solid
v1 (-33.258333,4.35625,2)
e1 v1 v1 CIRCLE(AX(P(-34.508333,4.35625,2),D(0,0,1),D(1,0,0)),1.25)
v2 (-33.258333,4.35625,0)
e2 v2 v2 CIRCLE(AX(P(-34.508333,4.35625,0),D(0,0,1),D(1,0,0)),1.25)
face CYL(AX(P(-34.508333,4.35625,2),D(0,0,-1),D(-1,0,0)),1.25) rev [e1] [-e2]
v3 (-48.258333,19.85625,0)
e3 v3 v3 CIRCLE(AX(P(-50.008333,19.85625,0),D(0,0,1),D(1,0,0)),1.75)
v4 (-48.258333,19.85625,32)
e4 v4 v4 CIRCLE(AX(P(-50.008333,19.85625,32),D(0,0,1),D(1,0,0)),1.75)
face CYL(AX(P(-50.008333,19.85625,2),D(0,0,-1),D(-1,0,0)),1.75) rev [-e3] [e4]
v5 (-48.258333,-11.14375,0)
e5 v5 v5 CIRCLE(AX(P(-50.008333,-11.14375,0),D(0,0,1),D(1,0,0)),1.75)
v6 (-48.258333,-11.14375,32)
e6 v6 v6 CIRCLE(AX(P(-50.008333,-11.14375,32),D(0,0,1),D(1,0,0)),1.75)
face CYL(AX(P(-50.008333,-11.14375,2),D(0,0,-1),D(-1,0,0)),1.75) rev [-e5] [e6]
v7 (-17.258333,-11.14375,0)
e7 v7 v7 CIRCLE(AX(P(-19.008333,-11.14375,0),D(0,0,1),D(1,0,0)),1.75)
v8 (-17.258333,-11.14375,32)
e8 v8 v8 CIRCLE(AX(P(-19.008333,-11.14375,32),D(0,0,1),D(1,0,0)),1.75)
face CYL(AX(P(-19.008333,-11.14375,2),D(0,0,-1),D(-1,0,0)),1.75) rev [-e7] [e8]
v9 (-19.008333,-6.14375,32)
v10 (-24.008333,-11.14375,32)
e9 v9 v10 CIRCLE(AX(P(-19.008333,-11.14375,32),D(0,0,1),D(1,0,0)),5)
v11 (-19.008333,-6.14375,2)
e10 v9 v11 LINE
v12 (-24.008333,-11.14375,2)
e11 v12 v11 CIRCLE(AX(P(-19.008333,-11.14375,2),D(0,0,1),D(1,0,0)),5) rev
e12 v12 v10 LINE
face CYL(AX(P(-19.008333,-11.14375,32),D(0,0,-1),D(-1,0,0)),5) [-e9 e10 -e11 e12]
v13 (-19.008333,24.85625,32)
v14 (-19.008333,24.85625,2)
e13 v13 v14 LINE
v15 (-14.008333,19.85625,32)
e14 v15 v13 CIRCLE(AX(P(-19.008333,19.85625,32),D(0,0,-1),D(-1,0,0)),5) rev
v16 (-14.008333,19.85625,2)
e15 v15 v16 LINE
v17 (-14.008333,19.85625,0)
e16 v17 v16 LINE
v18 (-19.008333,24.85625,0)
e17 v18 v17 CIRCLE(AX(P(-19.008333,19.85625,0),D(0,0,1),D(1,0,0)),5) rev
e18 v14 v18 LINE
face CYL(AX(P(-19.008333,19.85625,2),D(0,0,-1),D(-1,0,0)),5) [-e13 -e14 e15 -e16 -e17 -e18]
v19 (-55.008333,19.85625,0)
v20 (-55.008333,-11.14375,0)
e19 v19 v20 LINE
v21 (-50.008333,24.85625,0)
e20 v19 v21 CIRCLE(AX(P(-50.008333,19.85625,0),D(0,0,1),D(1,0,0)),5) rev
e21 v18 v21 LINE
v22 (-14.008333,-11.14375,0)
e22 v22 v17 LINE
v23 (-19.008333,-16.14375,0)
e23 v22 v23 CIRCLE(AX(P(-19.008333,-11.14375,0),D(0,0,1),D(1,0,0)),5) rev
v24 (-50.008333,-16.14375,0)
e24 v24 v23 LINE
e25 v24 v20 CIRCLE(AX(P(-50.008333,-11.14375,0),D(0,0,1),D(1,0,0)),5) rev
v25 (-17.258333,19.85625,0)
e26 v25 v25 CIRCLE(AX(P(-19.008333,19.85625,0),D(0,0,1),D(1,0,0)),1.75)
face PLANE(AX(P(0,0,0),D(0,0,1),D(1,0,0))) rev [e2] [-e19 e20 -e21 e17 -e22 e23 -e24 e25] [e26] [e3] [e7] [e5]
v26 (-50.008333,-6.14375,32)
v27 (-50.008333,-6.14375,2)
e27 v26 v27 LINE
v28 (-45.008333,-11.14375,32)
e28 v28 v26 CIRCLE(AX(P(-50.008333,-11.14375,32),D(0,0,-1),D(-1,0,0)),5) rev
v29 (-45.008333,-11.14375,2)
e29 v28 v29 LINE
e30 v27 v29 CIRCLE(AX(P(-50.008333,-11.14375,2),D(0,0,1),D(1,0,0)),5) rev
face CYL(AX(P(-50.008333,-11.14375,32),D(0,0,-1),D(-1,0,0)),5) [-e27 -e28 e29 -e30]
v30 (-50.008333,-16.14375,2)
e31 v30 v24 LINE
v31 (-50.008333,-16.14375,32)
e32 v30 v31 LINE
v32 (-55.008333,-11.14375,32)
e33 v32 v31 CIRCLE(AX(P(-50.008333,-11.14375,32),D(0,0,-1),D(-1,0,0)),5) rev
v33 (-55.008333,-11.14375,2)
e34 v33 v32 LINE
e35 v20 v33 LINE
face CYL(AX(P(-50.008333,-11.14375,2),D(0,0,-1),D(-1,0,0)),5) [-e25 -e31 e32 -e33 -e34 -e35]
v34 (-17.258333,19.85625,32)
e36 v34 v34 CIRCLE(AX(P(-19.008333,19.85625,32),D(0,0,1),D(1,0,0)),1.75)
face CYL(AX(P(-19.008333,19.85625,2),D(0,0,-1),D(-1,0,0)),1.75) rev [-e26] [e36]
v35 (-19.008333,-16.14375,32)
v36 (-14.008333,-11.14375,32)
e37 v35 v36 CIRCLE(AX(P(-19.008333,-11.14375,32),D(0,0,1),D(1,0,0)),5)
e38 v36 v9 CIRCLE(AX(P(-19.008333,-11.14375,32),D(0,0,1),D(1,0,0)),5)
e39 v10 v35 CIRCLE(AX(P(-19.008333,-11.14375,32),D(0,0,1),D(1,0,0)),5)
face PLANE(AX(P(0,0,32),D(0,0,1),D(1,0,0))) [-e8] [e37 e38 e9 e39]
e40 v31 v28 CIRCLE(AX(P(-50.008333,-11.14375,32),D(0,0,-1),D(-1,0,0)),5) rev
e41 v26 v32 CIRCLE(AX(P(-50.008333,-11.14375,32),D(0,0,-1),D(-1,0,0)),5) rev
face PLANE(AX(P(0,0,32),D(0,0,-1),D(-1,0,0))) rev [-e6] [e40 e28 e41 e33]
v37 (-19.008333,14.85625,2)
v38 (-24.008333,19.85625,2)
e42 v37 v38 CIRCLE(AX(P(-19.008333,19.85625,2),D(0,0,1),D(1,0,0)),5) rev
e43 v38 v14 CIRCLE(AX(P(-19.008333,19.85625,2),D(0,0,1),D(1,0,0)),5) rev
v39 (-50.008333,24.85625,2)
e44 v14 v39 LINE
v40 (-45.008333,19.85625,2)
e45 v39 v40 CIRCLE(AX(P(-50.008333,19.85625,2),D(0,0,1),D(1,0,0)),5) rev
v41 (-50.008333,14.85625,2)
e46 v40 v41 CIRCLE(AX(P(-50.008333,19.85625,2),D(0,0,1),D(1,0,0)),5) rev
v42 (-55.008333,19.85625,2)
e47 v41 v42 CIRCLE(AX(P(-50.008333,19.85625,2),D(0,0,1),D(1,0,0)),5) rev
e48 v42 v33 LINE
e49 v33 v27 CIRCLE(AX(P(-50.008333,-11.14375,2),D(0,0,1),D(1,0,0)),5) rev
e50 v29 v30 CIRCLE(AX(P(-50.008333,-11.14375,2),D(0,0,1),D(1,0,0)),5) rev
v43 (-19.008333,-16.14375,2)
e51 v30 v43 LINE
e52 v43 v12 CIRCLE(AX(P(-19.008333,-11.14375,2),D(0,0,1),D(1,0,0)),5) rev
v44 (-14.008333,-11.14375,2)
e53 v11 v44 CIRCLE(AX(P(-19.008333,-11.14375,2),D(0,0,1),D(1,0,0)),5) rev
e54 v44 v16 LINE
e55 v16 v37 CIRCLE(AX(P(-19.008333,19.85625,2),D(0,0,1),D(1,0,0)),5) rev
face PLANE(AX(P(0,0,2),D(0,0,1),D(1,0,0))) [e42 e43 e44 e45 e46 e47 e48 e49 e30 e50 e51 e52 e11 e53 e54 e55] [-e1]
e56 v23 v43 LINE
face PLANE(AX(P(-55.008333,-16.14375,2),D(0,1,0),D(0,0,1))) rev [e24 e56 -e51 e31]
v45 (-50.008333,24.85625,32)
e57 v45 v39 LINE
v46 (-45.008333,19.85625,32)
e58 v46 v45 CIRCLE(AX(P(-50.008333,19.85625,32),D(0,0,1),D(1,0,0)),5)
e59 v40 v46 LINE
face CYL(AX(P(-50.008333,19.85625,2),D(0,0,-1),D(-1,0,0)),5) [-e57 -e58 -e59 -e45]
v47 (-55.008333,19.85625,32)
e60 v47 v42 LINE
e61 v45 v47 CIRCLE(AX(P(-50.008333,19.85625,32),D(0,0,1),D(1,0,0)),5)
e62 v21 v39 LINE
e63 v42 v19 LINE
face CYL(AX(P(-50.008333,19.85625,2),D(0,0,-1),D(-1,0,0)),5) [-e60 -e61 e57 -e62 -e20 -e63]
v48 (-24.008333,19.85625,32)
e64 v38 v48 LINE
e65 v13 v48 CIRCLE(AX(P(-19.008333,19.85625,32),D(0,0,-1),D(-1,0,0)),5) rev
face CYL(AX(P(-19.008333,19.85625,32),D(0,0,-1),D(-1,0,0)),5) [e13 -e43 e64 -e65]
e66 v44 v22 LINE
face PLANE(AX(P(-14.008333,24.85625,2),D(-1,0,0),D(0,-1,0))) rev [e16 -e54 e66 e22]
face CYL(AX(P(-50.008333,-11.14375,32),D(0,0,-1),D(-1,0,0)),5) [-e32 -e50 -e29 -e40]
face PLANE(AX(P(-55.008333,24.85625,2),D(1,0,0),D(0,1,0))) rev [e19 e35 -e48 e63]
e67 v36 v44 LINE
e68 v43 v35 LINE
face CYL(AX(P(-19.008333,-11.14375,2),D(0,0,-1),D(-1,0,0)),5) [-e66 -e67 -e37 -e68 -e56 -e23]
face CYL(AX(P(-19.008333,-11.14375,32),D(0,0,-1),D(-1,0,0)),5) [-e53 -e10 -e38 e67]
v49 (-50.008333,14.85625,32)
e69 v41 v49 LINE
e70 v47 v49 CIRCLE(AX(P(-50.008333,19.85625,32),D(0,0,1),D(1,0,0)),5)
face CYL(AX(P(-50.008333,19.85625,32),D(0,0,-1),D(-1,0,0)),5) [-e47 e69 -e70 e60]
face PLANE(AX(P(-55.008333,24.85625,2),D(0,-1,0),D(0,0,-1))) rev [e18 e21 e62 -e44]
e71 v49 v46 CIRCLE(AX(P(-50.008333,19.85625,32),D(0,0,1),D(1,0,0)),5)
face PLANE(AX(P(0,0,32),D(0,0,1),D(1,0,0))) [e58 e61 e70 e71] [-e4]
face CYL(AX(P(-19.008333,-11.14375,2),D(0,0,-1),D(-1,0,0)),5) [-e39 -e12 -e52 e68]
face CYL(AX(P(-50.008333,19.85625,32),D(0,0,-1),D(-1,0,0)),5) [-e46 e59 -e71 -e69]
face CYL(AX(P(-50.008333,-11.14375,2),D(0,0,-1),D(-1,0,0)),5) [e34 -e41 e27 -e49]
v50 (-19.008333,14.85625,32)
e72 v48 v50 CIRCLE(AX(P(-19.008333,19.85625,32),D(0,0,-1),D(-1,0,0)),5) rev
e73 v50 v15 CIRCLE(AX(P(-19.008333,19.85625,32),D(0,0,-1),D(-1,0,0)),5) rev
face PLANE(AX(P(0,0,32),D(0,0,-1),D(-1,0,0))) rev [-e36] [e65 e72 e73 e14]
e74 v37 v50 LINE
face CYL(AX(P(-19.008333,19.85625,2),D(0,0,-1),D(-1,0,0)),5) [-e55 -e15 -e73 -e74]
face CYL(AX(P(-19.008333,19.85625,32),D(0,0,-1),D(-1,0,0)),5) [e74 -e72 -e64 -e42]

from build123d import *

# Parameters (mm, degrees)
SKETCH1_W           = 41
SKETCH1_H           = 41
SKETCH1_R           = 1.75
SKETCH1_R_2         = 1.25
BOSS_EXTRUDE1_DEPTH = 2
SKETCH2_W           = 10
SKETCH2_H           = 10
SKETCH2_R           = 1.75
BOSS_EXTRUDE2_DEPTH = 30
FILLET1_R           = 5


with BuildPart() as part:
    # Sketch1 → Boss-Extrude1 (new body)
    with BuildSketch(Plane.XY):
        with Locations((-34.508333333, 4.35625)):
            Rectangle(SKETCH1_W, SKETCH1_H)
        with Locations((-50.008333333, 19.85625)):
            Circle(SKETCH1_R, mode=Mode.SUBTRACT)
        with Locations((-50.008333333, -11.14375)):
            Circle(SKETCH1_R, mode=Mode.SUBTRACT)
        with Locations((-19.008333333, -11.14375)):
            Circle(SKETCH1_R, mode=Mode.SUBTRACT)
        with Locations((-19.008333333, 19.85625)):
            Circle(SKETCH1_R, mode=Mode.SUBTRACT)
        with Locations((-34.508333333, 4.35625)):
            Circle(SKETCH1_R_2, mode=Mode.SUBTRACT)
    extrude(amount=BOSS_EXTRUDE1_DEPTH)

    # Sketch2 → Boss-Extrude2 (add)
    # profile 1 of 4: a face of its own
    with BuildSketch(Plane.XY.offset(2)):
        with Locations((-50.008333333, 19.85625)):
            Rectangle(SKETCH2_W, SKETCH2_H)
        with Locations((-50.008333333, 19.85625)):
            Circle(SKETCH2_R, mode=Mode.SUBTRACT)
    # profile 2 of 4: a face of its own
    with BuildSketch(Plane.XY.offset(2)):
        with Locations((-50.008333333, -11.14375)):
            Rectangle(SKETCH2_W, SKETCH2_H)
        with Locations((-50.008333333, -11.14375)):
            Circle(SKETCH2_R, mode=Mode.SUBTRACT)
    # profile 3 of 4: a face of its own
    with BuildSketch(Plane.XY.offset(2)):
        with Locations((-19.008333333, -11.14375)):
            Rectangle(SKETCH2_W, SKETCH2_H)
        with Locations((-19.008333333, -11.14375)):
            Circle(SKETCH2_R, mode=Mode.SUBTRACT)
    # profile 4 of 4: a face of its own
    with BuildSketch(Plane.XY.offset(2)):
        with Locations((-19.008333333, 19.85625)):
            Rectangle(SKETCH2_W, SKETCH2_H)
        with Locations((-19.008333333, 19.85625)):
            Circle(SKETCH2_R, mode=Mode.SUBTRACT)
    extrude(amount=BOSS_EXTRUDE2_DEPTH)

    # Fillet1
    fillet1_edges = [part.edges().sort_by_distance(p)[0] for p in [
        (-24.008333333, 24.85625, 17),
        (-24.008333333, -6.14375, 17),
        (-55.008333333, -6.14375, 17),
        (-55.008333333, 14.85625, 17),
        (-45.008333333, 24.85625, 17),
        (-45.008333333, -6.14375, 17),
        (-45.008333333, -16.14375, 17),
        (-24.008333333, -16.14375, 17),
        (-14.008333333, -6.14375, 17),
        (-14.008333333, 14.85625, 17),
        (-24.008333333, 14.85625, 17),
        (-45.008333333, 14.85625, 17),
        (-14.008333333, -16.14375, 16),
        (-14.008333333, 24.85625, 16),
        (-55.008333333, -16.14375, 16),
        (-55.008333333, 24.85625, 16),
    ]]
    fillet(fillet1_edges, radius=FILLET1_R - 0.0001)  # a hair under: the kernel refuses the full size


solid = part.part
